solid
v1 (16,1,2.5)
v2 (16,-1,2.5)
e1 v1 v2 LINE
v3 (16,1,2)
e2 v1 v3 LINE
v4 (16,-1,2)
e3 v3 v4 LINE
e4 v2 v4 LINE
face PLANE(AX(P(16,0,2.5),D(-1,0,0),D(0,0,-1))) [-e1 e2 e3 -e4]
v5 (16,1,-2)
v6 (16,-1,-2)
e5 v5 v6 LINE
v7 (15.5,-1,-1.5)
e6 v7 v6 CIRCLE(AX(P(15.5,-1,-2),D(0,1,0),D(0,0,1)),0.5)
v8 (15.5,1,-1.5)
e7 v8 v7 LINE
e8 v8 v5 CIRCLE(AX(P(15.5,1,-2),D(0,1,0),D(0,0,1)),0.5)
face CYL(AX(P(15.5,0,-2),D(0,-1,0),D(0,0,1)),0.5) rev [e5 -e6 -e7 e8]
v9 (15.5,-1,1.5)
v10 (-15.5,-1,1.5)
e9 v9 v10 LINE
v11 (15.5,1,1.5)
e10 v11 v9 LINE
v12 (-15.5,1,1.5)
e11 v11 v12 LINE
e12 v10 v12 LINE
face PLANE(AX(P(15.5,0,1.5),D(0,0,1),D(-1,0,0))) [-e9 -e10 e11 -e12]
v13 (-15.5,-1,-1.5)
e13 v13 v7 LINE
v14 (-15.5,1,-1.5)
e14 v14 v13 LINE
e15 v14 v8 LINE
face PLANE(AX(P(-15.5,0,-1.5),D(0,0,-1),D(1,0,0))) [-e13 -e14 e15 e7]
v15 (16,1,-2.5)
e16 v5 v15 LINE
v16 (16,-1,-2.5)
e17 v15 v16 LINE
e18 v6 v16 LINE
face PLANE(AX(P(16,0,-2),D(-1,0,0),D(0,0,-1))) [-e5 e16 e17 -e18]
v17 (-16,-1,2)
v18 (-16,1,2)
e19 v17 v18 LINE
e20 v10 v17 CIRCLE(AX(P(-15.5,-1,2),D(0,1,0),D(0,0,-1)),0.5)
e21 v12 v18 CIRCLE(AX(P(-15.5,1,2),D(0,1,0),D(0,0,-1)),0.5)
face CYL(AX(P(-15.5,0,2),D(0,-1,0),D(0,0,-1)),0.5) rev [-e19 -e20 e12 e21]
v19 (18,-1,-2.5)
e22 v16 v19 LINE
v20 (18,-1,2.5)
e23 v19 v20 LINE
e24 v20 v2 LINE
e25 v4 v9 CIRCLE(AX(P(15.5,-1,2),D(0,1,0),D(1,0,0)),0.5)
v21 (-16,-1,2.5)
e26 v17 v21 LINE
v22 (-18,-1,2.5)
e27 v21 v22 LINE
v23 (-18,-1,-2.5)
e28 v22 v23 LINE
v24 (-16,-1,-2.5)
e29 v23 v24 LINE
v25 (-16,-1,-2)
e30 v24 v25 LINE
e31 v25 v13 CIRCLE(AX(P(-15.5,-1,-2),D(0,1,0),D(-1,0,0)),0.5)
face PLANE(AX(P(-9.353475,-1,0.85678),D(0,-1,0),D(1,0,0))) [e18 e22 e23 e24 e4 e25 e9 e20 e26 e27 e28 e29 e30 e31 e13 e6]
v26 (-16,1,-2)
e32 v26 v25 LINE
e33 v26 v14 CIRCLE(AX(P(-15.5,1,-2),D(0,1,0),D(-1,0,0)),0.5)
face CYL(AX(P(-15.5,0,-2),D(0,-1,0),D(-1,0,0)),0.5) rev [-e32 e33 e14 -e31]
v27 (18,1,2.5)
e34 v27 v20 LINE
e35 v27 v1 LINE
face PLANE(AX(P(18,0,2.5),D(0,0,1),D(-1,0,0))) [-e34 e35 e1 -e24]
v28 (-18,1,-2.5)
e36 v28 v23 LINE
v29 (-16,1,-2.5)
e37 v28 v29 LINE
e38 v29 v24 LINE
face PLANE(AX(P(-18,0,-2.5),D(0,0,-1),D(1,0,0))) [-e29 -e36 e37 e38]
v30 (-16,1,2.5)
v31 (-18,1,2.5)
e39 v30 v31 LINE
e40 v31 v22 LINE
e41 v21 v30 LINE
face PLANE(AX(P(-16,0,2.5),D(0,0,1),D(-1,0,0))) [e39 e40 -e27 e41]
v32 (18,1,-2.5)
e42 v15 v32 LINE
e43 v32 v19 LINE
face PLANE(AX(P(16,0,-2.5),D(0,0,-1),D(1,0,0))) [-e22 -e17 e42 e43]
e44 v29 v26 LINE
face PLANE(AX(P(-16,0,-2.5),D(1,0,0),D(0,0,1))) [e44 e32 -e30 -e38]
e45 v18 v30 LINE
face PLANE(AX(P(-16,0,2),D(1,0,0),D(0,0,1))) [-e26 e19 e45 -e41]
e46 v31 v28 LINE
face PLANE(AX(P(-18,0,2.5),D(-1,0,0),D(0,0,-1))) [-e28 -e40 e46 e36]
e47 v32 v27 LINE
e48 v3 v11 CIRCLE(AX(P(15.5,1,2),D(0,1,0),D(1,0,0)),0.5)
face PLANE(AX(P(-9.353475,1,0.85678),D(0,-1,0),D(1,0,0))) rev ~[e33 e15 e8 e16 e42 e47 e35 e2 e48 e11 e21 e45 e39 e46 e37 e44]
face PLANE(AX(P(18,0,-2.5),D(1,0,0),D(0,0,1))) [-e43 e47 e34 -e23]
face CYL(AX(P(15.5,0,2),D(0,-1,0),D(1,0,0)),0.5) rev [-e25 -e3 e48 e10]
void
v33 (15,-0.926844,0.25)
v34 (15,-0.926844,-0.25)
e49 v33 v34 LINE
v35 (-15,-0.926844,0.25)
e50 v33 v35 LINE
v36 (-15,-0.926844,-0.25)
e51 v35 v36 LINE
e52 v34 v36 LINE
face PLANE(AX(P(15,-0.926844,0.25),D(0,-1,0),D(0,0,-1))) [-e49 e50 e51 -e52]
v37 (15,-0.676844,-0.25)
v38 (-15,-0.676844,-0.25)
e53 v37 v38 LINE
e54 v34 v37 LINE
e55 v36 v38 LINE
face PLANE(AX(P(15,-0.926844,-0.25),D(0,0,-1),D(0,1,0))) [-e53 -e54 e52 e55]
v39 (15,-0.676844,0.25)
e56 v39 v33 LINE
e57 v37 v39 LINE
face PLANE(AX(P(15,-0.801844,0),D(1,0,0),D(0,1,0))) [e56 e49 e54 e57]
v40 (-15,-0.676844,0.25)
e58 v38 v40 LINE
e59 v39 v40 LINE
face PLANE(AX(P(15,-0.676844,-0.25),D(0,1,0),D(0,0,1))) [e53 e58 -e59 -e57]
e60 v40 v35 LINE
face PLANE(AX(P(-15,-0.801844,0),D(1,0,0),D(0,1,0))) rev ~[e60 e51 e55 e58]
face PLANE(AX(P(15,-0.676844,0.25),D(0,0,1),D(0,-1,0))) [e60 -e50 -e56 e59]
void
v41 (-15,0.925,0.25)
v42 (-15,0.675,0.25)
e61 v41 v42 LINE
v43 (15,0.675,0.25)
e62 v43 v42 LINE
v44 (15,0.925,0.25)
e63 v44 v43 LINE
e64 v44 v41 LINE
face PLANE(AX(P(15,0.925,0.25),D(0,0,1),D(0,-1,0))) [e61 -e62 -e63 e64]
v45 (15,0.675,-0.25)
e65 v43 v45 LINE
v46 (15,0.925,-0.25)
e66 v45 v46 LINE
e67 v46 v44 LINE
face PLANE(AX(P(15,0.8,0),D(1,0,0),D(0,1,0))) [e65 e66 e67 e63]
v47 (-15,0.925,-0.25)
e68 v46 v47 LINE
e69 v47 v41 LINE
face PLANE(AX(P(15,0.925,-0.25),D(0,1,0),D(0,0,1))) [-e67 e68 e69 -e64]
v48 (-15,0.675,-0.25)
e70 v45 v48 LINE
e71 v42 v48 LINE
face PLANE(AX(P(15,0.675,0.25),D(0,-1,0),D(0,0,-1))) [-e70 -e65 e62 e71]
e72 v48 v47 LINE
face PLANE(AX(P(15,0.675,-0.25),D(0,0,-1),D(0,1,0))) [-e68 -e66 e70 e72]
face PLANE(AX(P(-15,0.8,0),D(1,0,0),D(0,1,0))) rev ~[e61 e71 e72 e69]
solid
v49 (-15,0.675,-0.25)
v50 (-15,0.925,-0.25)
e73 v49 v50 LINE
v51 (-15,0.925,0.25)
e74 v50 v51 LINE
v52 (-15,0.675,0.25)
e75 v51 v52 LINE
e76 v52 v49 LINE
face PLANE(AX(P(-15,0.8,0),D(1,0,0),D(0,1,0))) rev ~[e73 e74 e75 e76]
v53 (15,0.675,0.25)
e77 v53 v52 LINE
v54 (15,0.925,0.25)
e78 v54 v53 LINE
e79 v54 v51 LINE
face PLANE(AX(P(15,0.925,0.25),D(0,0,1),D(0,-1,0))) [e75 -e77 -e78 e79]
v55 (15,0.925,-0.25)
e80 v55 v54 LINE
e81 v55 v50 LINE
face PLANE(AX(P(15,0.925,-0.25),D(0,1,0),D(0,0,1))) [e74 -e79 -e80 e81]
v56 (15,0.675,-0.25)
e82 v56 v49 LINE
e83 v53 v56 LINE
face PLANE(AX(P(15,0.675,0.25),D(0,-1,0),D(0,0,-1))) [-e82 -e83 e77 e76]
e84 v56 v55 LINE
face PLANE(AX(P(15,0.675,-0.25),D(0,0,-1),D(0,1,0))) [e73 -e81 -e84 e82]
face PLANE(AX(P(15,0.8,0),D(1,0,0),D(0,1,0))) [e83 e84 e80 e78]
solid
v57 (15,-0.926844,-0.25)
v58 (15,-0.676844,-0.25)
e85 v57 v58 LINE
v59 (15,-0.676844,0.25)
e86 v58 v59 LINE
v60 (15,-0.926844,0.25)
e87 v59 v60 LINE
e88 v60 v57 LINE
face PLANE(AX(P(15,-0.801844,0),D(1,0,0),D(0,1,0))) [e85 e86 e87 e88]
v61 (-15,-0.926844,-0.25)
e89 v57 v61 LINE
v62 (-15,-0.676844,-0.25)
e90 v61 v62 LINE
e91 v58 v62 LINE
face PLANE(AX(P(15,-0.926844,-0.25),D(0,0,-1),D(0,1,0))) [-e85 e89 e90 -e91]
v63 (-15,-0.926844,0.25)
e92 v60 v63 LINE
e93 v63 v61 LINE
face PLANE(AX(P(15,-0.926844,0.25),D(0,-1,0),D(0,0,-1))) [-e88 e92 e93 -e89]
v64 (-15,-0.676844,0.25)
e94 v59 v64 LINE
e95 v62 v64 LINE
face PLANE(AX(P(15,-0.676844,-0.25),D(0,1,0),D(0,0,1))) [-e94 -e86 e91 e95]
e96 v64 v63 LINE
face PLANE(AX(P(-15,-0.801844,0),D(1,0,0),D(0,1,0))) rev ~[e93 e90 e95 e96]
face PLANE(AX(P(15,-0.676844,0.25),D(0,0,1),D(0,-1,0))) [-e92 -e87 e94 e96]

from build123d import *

# Parameters (mm, degrees)
F1_DEPTH = 1
F4_DEPTH = 30
F5_DEPTH = 30


with BuildPart() as f1:
    # F0 (on Front) → F1 (new body, symmetric)
    with BuildSketch(Plane.XZ):
        with BuildLine():
            Line((-16, 2.5), (-18, 2.5))
            Line((-18, 2.5), (-18, 0))
            Line((-18, 0), (0, 0))
            Line((0, 0), (0, 1.5))
            Line((0, 1.5), (-15.5, 1.5))
            ThreePointArc((-15.5, 1.5), (-15.8535533906, 1.6464466094), (-16, 2))
            Line((-16, 2), (-16, 2.5))
        make_face()
        with BuildLine():
            Line((0, 1.5), (0, 0))
            Line((0, 0), (18, 0))
            Line((18, 0), (18, 2.5))
            Line((18, 2.5), (16, 2.5))
            Line((16, 2.5), (16, 2))
            ThreePointArc((16, 2), (15.8535533906, 1.6464466094), (15.5, 1.5))
            Line((15.5, 1.5), (0, 1.5))
        make_face()
        with BuildLine():
            Line((0, 0), (-18, 0))
            Line((-18, 0), (-18, -2.5))
            Line((-18, -2.5), (-16, -2.5))
            Line((-16, -2.5), (-16, -2))
            ThreePointArc((-16, -2), (-15.8535533906, -1.6464466094), (-15.5, -1.5))
            Line((-15.5, -1.5), (0, -1.5))
            Line((0, -1.5), (15.5, -1.5))
            ThreePointArc((15.5, -1.5), (15.8535533906, -1.6464466094), (16, -2))
            Line((16, -2), (16, -2.5))
            Line((16, -2.5), (18, -2.5))
            Line((18, -2.5), (18, 0))
            Line((18, 0), (0, 0))
        make_face()
    extrude(amount=F1_DEPTH, both=True)

    # F3 (on offset) → F5 (cut)
    with BuildSketch(Plane.YZ.offset(15)):
        Polygon((0.925000053, -0.25), (0.925000053, 0.25), (0.674999947, 0.25), (0.674999947, 0), (0.674999947, -0.25), align=None)
        Polygon((-0.6768444622, -0.25), (-0.6768444622, 0), (-0.6768444622, 0.25), (-0.9268444622, 0.25), (-0.9268444622, -0.25), align=None)
    extrude(amount=-F5_DEPTH, mode=Mode.SUBTRACT)


with BuildPart() as f4:
    # F3 (on offset) → F4 (new body)
    with BuildSketch(Plane.YZ.offset(15)):
        Polygon((-0.6768444622, -0.25), (-0.6768444622, 0), (-0.6768444622, 0.25), (-0.9268444622, 0.25), (-0.9268444622, -0.25), align=None)
    extrude(amount=-F4_DEPTH)


with BuildPart() as f4b:
    # F3 (on offset) → F4, piece 2 (new body)
    with BuildSketch(Plane.YZ.offset(15)):
        Polygon((0.925000053, -0.25), (0.925000053, 0.25), (0.674999947, 0.25), (0.674999947, 0), (0.674999947, -0.25), align=None)
    extrude(amount=-F4_DEPTH)


solid = Compound([f1.part, f4.part, f4b.part])
